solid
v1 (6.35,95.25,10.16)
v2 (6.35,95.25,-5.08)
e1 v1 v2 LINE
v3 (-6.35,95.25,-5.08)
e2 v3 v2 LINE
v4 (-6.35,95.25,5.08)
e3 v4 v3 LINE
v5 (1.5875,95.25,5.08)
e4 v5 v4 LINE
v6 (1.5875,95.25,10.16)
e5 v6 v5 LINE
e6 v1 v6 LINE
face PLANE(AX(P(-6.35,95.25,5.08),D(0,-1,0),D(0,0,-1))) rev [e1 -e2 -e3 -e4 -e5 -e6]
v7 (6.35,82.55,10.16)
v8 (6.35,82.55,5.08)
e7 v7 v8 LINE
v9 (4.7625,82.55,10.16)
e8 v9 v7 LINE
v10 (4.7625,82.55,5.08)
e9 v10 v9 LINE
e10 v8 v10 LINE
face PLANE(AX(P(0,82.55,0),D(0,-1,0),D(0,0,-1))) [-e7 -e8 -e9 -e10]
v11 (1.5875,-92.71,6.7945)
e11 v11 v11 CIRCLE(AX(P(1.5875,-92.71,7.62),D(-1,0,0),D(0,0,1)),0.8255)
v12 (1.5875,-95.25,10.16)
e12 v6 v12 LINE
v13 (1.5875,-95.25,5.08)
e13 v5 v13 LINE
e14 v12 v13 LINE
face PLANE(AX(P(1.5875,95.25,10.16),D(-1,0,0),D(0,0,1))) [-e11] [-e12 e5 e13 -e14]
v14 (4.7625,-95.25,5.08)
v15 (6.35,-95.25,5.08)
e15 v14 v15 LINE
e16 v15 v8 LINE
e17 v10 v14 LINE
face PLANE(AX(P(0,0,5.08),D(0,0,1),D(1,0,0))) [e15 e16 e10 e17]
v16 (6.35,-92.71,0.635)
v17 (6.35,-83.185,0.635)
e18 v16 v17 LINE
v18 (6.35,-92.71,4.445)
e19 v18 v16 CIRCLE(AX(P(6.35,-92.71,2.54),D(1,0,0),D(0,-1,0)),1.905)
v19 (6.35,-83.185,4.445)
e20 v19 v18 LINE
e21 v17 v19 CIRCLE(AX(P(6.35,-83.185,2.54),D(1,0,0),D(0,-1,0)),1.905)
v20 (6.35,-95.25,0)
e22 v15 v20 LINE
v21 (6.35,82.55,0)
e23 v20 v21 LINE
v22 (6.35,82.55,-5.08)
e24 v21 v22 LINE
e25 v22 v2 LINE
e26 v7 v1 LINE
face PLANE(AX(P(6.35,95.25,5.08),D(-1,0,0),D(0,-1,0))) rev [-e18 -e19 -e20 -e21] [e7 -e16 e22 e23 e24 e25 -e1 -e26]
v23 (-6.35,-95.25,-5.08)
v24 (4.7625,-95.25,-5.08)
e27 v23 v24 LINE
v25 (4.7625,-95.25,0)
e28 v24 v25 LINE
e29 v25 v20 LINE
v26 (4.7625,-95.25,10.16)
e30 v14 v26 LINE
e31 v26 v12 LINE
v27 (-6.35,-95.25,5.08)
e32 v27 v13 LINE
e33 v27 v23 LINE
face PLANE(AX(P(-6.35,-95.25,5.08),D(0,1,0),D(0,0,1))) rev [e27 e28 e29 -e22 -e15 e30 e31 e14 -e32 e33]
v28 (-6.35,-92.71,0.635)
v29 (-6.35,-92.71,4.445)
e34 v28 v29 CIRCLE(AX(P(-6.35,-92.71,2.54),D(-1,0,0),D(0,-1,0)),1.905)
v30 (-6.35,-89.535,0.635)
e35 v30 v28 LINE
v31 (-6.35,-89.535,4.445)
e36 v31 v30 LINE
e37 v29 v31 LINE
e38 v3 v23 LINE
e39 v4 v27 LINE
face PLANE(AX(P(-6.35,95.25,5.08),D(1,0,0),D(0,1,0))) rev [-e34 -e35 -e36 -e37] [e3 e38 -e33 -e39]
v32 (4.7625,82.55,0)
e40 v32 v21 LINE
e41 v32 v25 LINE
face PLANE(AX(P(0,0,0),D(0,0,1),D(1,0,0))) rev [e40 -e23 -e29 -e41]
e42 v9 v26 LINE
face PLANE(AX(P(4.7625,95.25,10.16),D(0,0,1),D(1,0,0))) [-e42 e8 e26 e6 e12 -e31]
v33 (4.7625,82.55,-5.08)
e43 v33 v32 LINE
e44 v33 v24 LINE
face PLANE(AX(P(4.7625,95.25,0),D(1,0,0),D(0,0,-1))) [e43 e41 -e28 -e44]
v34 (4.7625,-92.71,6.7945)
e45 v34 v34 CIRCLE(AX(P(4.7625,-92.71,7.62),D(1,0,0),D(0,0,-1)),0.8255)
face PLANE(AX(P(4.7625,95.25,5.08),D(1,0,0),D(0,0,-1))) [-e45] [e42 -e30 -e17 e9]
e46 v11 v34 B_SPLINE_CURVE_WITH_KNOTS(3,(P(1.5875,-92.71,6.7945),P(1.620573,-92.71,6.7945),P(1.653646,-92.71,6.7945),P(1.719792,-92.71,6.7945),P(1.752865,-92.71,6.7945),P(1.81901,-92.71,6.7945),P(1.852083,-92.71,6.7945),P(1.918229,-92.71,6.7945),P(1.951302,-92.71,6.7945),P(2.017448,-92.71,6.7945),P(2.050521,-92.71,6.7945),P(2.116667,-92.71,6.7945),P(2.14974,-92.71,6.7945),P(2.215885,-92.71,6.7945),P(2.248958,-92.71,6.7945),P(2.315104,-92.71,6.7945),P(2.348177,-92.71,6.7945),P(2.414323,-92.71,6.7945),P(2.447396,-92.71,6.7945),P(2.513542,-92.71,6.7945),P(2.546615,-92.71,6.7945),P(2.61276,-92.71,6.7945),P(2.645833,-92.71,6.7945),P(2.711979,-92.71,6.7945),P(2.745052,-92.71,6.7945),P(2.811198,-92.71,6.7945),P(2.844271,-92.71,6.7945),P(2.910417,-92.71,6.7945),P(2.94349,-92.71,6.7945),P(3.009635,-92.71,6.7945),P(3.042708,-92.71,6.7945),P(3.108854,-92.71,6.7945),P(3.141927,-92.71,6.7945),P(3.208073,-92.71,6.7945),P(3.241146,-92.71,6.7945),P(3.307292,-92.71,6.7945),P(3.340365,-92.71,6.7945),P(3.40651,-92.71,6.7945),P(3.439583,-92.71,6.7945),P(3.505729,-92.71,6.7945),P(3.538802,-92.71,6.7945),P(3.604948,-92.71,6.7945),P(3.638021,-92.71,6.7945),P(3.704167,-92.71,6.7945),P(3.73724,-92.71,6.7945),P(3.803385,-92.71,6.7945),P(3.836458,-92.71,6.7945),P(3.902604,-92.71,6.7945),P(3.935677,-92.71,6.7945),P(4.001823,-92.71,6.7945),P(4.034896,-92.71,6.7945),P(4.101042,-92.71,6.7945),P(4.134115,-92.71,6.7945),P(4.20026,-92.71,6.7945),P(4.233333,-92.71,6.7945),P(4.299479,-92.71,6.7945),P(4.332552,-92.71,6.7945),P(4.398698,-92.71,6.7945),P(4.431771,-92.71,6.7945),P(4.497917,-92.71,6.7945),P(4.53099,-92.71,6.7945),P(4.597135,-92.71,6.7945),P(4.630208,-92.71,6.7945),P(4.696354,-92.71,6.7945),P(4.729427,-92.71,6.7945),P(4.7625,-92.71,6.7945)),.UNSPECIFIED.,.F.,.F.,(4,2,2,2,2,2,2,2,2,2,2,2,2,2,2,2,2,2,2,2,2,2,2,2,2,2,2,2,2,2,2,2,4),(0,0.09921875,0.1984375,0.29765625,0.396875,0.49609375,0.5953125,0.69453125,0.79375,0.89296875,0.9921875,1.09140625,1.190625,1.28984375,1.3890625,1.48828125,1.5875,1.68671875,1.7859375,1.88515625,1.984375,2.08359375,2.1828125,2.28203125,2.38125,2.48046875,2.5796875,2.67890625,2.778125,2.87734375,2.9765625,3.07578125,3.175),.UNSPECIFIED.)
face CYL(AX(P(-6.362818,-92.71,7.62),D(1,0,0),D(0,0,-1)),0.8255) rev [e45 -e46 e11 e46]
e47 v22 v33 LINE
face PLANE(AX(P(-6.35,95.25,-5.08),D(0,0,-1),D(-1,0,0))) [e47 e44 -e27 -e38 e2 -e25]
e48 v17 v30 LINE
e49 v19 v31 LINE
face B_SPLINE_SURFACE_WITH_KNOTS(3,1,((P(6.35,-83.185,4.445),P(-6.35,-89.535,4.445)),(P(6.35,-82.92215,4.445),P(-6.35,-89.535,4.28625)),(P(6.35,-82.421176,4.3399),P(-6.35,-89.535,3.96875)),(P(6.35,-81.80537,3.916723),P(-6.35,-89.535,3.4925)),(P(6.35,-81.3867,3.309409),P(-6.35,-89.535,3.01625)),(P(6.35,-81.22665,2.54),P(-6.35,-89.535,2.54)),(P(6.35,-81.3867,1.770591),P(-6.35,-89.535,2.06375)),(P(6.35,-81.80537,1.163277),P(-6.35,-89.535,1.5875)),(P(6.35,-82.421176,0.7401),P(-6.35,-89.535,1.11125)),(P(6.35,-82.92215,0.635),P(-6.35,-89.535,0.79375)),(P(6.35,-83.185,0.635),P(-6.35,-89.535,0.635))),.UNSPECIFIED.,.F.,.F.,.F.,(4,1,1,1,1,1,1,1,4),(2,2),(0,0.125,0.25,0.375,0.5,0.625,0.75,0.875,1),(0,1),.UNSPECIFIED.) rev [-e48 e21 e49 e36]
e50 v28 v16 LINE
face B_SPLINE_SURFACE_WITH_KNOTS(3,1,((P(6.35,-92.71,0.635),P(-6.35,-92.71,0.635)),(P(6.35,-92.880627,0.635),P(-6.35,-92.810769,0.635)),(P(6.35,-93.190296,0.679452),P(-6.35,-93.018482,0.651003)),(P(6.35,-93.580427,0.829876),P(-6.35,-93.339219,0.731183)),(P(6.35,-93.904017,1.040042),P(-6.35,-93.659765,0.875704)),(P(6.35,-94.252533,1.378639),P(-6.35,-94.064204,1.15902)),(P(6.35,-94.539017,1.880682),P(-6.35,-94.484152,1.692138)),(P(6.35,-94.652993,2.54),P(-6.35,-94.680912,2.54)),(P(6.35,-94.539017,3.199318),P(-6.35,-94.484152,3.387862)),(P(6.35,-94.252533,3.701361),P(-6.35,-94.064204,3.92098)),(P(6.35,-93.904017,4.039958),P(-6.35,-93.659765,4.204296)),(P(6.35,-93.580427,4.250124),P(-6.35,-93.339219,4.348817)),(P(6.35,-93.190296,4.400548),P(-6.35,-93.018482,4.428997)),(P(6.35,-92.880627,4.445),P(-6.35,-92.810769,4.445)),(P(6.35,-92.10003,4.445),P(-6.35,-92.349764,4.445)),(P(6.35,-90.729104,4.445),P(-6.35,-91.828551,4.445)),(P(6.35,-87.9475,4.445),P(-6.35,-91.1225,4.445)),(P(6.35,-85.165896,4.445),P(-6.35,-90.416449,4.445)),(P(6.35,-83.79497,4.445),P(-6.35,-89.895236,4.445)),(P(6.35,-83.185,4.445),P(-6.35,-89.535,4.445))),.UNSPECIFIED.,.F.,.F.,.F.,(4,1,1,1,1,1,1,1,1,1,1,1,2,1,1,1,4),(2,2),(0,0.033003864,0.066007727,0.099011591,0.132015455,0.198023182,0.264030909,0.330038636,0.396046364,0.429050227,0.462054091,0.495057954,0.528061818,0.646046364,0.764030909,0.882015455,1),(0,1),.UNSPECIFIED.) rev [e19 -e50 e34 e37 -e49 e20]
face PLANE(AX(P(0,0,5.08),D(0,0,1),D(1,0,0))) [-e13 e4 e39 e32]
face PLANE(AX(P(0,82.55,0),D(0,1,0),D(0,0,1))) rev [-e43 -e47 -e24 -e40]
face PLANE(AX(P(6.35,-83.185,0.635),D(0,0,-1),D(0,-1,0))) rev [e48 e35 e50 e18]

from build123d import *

# Parameters (mm, degrees)
SKETCH1_W           = 12.7
SKETCH1_H           = 190.5
BOSS_EXTRUDE1_DEPTH = 5.08
SKETCH5_W           = 3.175
SKETCH5_H           = 5.08
SKETCH5_W_2         = 11.1125
BOSS_EXTRUDE2_DEPTH = 190.5
SKETCH6_R           = 0.8255
CUT_EXTRUDE1_DEPTH  = 97.432752618
SKETCH7_W           = 1.5875
SKETCH7_H           = 5.08
BOSS_EXTRUDE3_DEPTH = 12.7


with BuildPart() as part:
    # Sketch1 → Boss-Extrude1 (new body)
    with BuildSketch(Plane.XY):
        Rectangle(SKETCH1_W, SKETCH1_H)
    extrude(amount=BOSS_EXTRUDE1_DEPTH)

    # Cut-Loft1: read off the stored shape, not the designer's step
    # Cut-Loft1: loft between two sections, ruled curve by curve
    cut_loft1_from = [
        Edge.make_bspline([(6.35, -92.71, 0.635), (6.35, -92.880627047, 0.635), (6.35, -93.190295538, 0.679451635), (6.35, -93.580426831, 0.829875615), (6.35, -93.904017113, 1.040042177), (6.35, -94.252532736, 1.378638842), (6.35, -94.539016945, 1.880682246), (6.35, -94.652993182, 2.54), (6.35, -94.539016945, 3.199317754), (6.35, -94.252532736, 3.701361158), (6.35, -93.904017113, 4.039957823), (6.35, -93.580426831, 4.250124385), (6.35, -93.190295538, 4.400548365), (6.35, -92.880627047, 4.445), (6.35, -92.100030361, 4.445), (6.35, -90.729103522, 4.445), (6.35, -87.9475, 4.445), (6.35, -85.165896478, 4.445), (6.35, -83.794969639, 4.445), (6.35, -83.185, 4.445)], [0, 0, 0, 0, 0.033003864, 0.066007727, 0.099011591, 0.132015455, 0.198023182, 0.264030909, 0.330038636, 0.396046364, 0.429050227, 0.462054091, 0.495057954, 0.528061818, 0.528061818, 0.646046364, 0.764030909, 0.882015455, 1, 1, 1, 1], 3),
        Edge.make_bspline([(6.35, -83.185, 4.445), (6.35, -82.922150477, 4.445), (6.35, -82.421175953, 4.339900308), (6.35, -81.805369524, 3.916723034), (6.35, -81.386700238, 3.309409446), (6.35, -81.226649881, 2.54), (6.35, -81.386700238, 1.770590554), (6.35, -81.805369524, 1.163276966), (6.35, -82.421175953, 0.740099692), (6.35, -82.922150477, 0.635), (6.35, -83.185, 0.635)], [0, 0, 0, 0, 0.125, 0.25, 0.375, 0.5, 0.625, 0.75, 0.875, 1, 1, 1, 1], 3),
        Edge.make_line((6.35, -92.71, 0.635), (6.35, -83.185, 0.635)),
    ]
    cut_loft1_to = [
        Edge.make_bspline([(-6.35, -92.71, 0.635), (-6.35, -92.81076887, 0.635), (-6.35, -93.018481978, 0.65100327), (-6.35, -93.339219021, 0.731183475), (-6.35, -93.659764721, 0.875704473), (-6.35, -94.064204291, 1.159019535), (-6.35, -94.484151999, 1.692137872), (-6.35, -94.680912476, 2.54), (-6.35, -94.484151999, 3.387862128), (-6.35, -94.064204291, 3.920980465), (-6.35, -93.659764721, 4.204295527), (-6.35, -93.339219021, 4.348816525), (-6.35, -93.018481978, 4.42899673), (-6.35, -92.81076887, 4.445), (-6.35, -92.349764316, 4.445), (-6.35, -91.828550912, 4.445), (-6.35, -91.1225, 4.445), (-6.35, -90.416449088, 4.445), (-6.35, -89.895235684, 4.445), (-6.35, -89.535, 4.445)], [0, 0, 0, 0, 0.033003864, 0.066007727, 0.099011591, 0.132015455, 0.198023182, 0.264030909, 0.330038636, 0.396046364, 0.429050227, 0.462054091, 0.495057954, 0.528061818, 0.528061818, 0.646046364, 0.764030909, 0.882015455, 1, 1, 1, 1], 3),
        Edge.make_bspline([(-6.35, -89.535, 4.445), (-6.35, -89.535, 4.28625), (-6.35, -89.535, 3.96875), (-6.35, -89.535, 3.4925), (-6.35, -89.535, 3.01625), (-6.35, -89.535, 2.54), (-6.35, -89.535, 2.06375), (-6.35, -89.535, 1.5875), (-6.35, -89.535, 1.11125), (-6.35, -89.535, 0.79375), (-6.35, -89.535, 0.635)], [0, 0, 0, 0, 0.125, 0.25, 0.375, 0.5, 0.625, 0.75, 0.875, 1, 1, 1, 1], 3),
        Edge.make_line((-6.35, -92.71, 0.635), (-6.35, -89.535, 0.635)),
    ]
    cut_loft1 = Solid(Shell([*[Face.make_surface_from_curves(cut_loft1_from[k], cut_loft1_to[k]) for k in range(3)], Face(Wire(cut_loft1_from)), Face(Wire(cut_loft1_to))]))
    add(cut_loft1, mode=Mode.SUBTRACT)

    # Sketch5 → Boss-Extrude2 (add)
    with BuildSketch(Plane.XZ.offset(95.25)):
        with Locations((3.175, 7.62)):
            Rectangle(SKETCH5_W, SKETCH5_H)
        with Locations((-0.79375, -2.54)):
            Rectangle(SKETCH5_W_2, SKETCH5_H)
    extrude(amount=-BOSS_EXTRUDE2_DEPTH)

    # Sketch6 → Cut-Extrude1 (cut, through all)
    with BuildSketch(Plane(origin=(4.7625, 0, 0), x_dir=(0, 0, -1), z_dir=(1, 0, 0))):
        with Locations((-7.62, -92.71)):
            Circle(SKETCH6_R)
    extrude(amount=-CUT_EXTRUDE1_DEPTH, mode=Mode.SUBTRACT)

    # Sketch7 → Boss-Extrude3 (add)
    with BuildSketch(Plane(origin=(0, 95.25, 0), x_dir=(1, 0, 0), z_dir=(0, 1, 0))):
        with Locations((5.55625, 2.54)):
            Rectangle(SKETCH7_W, SKETCH7_H)
        with Locations((5.55625, -7.62)):
            Rectangle(SKETCH7_W, SKETCH7_H)
    extrude(amount=-BOSS_EXTRUDE3_DEPTH)


solid = part.part
